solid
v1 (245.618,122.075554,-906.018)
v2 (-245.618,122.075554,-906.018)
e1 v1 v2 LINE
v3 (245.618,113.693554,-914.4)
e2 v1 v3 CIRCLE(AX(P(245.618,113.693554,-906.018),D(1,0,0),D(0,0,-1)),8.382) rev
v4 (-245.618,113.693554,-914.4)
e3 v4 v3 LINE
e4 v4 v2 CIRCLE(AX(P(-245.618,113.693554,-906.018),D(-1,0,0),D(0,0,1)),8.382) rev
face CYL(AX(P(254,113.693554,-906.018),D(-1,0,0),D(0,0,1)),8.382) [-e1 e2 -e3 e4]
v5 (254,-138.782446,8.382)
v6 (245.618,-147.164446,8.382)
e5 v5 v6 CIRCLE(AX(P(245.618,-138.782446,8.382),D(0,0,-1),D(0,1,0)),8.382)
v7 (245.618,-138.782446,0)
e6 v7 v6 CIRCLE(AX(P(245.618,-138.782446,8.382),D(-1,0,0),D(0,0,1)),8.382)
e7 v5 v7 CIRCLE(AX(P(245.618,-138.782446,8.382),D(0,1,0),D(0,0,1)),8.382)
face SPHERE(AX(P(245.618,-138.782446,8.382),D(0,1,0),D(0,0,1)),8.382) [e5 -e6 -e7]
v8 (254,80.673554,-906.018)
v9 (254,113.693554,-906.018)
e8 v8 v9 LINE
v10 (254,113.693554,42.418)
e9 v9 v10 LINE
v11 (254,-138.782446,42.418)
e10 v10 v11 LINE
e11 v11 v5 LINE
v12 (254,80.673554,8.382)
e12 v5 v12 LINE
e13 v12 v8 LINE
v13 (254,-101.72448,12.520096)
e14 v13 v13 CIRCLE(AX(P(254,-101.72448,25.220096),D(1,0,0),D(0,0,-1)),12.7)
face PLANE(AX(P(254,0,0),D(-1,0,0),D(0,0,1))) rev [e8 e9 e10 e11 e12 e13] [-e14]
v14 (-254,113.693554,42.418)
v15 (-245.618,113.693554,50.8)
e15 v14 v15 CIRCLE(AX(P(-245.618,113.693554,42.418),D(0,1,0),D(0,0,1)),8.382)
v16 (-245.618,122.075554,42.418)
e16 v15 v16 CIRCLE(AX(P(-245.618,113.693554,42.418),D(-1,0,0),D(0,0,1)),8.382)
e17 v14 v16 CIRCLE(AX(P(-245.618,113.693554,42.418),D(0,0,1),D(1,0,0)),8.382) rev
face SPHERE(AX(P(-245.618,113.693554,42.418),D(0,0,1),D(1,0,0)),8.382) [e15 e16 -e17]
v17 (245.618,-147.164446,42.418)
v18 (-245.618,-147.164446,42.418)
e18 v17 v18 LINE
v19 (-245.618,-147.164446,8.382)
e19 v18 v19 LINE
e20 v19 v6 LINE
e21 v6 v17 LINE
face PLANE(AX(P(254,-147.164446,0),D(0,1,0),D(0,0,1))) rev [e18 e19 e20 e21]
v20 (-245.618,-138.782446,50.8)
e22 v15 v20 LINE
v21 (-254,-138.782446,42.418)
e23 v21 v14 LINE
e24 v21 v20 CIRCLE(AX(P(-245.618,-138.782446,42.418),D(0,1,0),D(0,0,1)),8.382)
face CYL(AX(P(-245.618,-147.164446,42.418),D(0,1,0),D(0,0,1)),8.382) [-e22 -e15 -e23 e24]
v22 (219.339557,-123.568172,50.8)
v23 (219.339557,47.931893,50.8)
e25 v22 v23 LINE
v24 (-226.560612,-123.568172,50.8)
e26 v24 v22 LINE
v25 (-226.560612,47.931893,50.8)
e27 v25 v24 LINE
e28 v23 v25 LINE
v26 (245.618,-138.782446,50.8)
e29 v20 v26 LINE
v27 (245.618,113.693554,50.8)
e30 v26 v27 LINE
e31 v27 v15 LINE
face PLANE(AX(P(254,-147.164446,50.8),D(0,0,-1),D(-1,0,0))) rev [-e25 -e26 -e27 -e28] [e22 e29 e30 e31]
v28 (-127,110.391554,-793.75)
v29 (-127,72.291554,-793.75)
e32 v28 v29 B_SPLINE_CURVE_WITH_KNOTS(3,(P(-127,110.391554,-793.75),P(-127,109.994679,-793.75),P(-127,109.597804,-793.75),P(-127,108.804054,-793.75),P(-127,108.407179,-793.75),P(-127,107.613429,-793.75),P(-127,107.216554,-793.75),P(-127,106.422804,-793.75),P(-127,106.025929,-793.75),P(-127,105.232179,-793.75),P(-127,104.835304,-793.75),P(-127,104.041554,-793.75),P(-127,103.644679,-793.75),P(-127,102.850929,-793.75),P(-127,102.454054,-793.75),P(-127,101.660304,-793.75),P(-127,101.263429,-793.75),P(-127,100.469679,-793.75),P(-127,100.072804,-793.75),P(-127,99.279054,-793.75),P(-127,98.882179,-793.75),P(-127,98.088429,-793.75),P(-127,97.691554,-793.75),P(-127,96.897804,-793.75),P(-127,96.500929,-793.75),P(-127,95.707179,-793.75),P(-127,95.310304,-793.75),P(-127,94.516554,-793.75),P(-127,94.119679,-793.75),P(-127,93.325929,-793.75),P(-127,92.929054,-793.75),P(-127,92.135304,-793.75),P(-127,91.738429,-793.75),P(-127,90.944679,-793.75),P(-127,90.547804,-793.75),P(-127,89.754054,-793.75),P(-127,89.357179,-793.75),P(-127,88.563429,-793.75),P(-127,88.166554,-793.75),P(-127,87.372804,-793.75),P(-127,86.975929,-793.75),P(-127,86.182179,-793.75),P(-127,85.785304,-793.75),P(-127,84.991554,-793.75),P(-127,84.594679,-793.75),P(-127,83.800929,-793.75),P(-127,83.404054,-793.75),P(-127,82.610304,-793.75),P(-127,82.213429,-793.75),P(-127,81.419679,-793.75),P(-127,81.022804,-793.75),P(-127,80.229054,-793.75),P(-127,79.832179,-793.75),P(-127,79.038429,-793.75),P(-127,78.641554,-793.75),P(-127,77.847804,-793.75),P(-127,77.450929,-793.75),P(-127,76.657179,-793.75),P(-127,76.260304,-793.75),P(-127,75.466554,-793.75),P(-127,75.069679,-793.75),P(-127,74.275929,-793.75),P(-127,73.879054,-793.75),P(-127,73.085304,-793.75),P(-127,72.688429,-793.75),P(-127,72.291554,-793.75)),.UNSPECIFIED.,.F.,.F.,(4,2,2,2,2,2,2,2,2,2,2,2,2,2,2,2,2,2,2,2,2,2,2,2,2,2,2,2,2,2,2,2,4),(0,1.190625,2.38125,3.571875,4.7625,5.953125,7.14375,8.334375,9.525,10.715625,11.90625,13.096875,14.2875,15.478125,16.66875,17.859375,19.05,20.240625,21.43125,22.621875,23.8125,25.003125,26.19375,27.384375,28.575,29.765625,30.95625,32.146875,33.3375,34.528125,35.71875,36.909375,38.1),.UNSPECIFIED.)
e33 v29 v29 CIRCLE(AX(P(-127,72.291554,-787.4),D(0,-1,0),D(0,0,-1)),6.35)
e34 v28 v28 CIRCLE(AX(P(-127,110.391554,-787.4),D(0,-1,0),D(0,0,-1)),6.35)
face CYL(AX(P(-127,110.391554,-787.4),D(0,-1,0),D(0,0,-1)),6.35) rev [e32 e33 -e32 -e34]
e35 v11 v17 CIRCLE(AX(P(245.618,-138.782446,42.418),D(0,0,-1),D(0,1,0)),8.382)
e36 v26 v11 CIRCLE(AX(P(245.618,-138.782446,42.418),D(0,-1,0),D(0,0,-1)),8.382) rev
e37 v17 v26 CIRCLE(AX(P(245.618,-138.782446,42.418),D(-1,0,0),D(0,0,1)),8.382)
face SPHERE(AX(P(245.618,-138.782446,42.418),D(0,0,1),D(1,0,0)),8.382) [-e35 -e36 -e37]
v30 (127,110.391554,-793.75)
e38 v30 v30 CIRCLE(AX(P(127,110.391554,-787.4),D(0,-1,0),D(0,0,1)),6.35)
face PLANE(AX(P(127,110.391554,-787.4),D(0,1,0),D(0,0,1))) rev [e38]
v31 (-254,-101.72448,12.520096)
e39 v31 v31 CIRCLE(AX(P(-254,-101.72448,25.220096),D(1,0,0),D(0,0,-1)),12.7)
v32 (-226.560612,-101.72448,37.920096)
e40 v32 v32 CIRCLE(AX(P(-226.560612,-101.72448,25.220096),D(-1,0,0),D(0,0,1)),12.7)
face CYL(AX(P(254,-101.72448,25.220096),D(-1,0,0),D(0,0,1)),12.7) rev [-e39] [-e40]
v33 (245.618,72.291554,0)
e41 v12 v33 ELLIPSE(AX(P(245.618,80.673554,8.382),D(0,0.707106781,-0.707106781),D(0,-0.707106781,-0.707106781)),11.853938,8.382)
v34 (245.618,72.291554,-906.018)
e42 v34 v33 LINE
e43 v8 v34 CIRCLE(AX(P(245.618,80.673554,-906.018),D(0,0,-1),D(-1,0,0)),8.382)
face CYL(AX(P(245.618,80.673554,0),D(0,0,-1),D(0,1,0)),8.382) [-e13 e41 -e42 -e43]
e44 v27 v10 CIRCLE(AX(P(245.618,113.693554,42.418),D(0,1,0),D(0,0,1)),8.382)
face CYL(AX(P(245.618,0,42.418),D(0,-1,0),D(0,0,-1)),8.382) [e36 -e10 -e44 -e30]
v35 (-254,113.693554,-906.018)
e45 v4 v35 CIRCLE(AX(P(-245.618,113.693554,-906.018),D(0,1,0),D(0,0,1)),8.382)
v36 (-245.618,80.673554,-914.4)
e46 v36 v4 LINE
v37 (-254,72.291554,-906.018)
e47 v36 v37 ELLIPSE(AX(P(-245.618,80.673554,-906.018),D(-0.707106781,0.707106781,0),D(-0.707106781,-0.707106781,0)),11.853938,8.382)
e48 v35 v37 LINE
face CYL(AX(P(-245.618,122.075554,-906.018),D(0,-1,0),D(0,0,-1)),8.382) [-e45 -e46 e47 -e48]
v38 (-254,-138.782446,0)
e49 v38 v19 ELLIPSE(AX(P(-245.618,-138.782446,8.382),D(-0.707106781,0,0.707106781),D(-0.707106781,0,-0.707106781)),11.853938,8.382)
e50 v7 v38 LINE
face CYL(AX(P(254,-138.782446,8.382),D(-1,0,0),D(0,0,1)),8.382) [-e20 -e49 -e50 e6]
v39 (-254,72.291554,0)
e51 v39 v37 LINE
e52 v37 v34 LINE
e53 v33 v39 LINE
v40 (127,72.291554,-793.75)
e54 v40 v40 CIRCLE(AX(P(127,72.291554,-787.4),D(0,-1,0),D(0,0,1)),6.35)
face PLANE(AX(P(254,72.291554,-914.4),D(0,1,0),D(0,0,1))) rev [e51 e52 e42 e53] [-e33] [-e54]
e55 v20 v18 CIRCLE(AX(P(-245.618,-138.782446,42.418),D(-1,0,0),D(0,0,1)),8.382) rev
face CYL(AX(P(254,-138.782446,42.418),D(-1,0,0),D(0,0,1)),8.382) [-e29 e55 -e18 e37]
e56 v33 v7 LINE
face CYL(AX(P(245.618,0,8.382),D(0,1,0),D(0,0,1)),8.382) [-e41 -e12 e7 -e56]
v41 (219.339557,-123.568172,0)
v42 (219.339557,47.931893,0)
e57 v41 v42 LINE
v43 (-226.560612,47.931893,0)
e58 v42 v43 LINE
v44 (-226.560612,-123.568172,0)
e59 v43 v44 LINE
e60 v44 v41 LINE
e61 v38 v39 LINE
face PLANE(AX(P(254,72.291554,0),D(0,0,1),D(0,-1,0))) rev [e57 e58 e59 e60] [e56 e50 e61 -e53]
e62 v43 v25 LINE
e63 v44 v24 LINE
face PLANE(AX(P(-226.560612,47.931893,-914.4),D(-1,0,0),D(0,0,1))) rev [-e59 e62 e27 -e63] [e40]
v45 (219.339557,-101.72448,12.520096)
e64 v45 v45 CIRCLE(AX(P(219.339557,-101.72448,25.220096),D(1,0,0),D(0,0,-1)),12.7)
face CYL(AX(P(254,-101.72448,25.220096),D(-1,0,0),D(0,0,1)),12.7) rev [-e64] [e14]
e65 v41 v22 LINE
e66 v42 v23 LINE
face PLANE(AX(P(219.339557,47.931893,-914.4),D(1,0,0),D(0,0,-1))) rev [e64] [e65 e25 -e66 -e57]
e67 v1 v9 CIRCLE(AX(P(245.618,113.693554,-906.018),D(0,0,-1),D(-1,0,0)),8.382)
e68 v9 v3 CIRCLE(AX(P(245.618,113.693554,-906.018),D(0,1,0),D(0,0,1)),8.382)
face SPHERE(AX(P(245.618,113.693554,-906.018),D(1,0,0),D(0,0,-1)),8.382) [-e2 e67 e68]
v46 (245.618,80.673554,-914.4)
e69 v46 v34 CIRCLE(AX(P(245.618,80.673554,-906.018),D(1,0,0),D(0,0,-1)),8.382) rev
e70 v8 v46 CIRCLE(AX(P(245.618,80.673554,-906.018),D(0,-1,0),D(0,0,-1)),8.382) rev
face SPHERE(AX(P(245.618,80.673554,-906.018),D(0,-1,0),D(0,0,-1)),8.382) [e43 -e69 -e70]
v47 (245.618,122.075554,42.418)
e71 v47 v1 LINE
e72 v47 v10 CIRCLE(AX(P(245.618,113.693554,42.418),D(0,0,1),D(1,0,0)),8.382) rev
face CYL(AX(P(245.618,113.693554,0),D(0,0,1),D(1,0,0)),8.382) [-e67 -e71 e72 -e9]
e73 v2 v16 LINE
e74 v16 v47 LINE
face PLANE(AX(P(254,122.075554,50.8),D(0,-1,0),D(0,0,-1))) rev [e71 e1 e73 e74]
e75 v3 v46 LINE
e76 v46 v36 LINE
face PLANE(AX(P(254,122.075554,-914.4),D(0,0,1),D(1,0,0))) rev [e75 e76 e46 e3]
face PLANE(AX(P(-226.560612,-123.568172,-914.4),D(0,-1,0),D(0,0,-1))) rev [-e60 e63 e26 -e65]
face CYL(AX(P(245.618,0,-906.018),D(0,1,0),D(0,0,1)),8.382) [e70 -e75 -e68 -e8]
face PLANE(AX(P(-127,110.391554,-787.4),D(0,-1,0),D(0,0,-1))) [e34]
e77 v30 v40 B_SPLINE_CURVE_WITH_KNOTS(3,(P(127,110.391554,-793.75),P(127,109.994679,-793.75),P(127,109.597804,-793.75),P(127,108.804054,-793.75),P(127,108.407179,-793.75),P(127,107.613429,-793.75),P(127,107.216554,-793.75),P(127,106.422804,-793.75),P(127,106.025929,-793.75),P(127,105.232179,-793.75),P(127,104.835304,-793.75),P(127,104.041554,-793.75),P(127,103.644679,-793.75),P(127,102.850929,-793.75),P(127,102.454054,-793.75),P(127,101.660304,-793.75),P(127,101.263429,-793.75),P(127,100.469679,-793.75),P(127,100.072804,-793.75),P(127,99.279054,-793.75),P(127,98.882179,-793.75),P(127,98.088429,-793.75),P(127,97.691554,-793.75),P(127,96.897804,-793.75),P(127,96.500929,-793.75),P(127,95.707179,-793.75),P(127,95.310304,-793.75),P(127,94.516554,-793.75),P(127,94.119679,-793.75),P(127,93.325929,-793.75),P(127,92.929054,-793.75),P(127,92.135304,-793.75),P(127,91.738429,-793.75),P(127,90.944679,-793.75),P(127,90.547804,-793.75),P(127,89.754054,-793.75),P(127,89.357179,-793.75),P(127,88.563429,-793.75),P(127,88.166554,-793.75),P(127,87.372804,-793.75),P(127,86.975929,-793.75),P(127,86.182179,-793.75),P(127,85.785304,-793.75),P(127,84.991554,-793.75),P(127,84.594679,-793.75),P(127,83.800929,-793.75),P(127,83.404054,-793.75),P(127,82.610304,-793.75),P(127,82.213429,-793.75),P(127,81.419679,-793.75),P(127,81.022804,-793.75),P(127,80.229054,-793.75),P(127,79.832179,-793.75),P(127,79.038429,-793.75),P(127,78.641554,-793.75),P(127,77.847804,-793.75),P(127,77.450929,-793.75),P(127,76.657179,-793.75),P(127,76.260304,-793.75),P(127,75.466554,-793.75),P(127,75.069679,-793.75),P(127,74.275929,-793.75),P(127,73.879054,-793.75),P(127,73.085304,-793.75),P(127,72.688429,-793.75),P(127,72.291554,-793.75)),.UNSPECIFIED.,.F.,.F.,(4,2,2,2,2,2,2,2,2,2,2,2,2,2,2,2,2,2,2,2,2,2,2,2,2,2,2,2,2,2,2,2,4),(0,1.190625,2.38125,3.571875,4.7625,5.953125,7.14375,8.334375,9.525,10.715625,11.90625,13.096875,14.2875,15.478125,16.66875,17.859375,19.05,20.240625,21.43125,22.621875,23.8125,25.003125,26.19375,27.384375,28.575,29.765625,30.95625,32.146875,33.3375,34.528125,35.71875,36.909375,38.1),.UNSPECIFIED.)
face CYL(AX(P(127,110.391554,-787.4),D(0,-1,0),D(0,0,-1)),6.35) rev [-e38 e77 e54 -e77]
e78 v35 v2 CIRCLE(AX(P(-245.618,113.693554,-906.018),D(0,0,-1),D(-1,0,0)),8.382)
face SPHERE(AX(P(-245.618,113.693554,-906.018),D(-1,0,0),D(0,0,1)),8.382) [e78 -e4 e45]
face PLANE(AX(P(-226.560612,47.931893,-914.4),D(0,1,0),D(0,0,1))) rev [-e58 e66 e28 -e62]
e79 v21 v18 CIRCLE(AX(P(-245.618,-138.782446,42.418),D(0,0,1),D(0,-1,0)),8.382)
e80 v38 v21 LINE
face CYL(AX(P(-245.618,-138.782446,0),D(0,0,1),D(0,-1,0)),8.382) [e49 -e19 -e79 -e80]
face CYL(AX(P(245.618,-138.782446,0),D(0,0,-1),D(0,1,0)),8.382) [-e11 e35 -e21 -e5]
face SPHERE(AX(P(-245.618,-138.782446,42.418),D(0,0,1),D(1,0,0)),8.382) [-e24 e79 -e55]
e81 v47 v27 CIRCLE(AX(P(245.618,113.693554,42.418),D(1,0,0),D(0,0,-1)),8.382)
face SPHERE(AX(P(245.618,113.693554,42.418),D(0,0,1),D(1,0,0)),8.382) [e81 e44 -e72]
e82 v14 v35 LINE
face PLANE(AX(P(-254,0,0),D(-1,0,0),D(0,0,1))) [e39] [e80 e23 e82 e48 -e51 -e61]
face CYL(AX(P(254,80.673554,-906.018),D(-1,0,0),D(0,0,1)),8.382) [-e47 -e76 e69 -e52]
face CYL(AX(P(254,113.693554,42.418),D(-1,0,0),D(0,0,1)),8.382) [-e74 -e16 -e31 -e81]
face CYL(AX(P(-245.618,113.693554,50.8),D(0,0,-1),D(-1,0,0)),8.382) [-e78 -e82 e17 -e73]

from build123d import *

# Parameters (mm, degrees)
SKETCH1_R           = 12.7
BOSS_EXTRUDE1_DEPTH = 254
FILLET1_R           = 8.382
FILLET2_R           = 8.382
SKETCH6_W           = 445.900168358
SKETCH6_H           = 171.500064753
CUT_EXTRUDE4_DEPTH  = 1009.8530191
SKETCH2_R           = 6.35
CUT_EXTRUDE5_DEPTH  = 38.1


with BuildPart() as part:
    # Sketch1 → Boss-Extrude1 (new, symmetric)
    with BuildSketch(Plane(origin=(0, 0, 0), x_dir=(0, 0, -1), z_dir=(1, 0, 0))):
        Polygon((-50.8, 122.075554067), (914.4, 122.075554067), (914.4, 72.291554067), (0, 72.291554067), (0, -147.164445933), (-50.8, -147.164445933), align=None)
        with Locations((-25.220095835, -101.724479604)):
            Circle(SKETCH1_R, mode=Mode.SUBTRACT)
    extrude(amount=BOSS_EXTRUDE1_DEPTH, both=True)

    # Fillet1
    fillet1_edges = [part.edges().sort_by_distance(p)[0] for p in [
        (0, 122.075554067, 50.8),
        (0, 122.075554067, -914.4),
        (0, 72.291554067, -914.4),
        (0, -147.164445933, 50.8),
        (254, -37.436445933, 0),
        (254, 72.291554067, -457.2),
        (254, 97.183554067, -914.4),
        (254, 122.075554067, -431.8),
        (254, -12.544445933, 50.8),
        (-254, 122.075554067, -431.8),
        (-254, 97.183554067, -914.4),
        (-254, -12.544445933, 50.8),
    ]]
    fillet(fillet1_edges, radius=FILLET1_R)

    # Fillet2
    # the kernel refuses this fillet: 8.382 mm, written as the material it takes off along each edge
    with BuildSketch(Plane(origin=(245.618, -138.782445933, 42.418), x_dir=(0, -1, 0), z_dir=(1, 0, 0))) as fillet2_piece_1_section:
        Polygon((0, 0), (FILLET2_R, 0), (FILLET2_R, -FILLET2_R), (0, -FILLET2_R), align=None)
    fillet2_piece_1 = extrude(amount=FILLET2_R, mode=Mode.PRIVATE)
    fillet2_piece_1 = fillet2_piece_1 - Plane(origin=(245.618, -138.782445933, 42.418), x_dir=(0, 0.7071067811865477, -0.7071067811865474), z_dir=(1, 0, 0)) * Sphere(FILLET2_R, mode=Mode.PRIVATE)
    add(fillet2_piece_1, mode=Mode.SUBTRACT)
    with BuildSketch(Plane(origin=(-245.618, -138.782445933, 42.418), x_dir=(0, -1, 0), z_dir=(-1, 0, 0))) as fillet2_piece_2_section:
        Polygon((0, 0), (FILLET2_R, 0), (FILLET2_R, FILLET2_R), (0, FILLET2_R), align=None)
    fillet2_piece_2 = extrude(amount=FILLET2_R, mode=Mode.PRIVATE)
    fillet2_piece_2 = fillet2_piece_2 - Plane(origin=(-245.618, -138.782445933, 42.418), x_dir=(0, 0.7071067811865477, -0.7071067811865474), z_dir=(-1, 0, 0)) * Sphere(FILLET2_R, mode=Mode.PRIVATE)
    add(fillet2_piece_2, mode=Mode.SUBTRACT)
    with BuildSketch(Plane(origin=(254, -147.164445933, 8.382), x_dir=(0, 1, 0), z_dir=(0, 0, 1))) as fillet2_piece_3:
        with BuildLine():
            CenterArc((FILLET2_R, FILLET2_R), FILLET2_R, 180, 90)
            Line((0, FILLET2_R), (0, 0))
            Line((0, 0), (FILLET2_R, 0))
        make_face()
    extrude(amount=34.036, mode=Mode.SUBTRACT)
    with BuildSketch(Plane(origin=(-254, -147.164445933, -20.955), x_dir=(0, 1, 0), z_dir=(0, 0, 1))) as fillet2_piece_4:
        with BuildLine():
            CenterArc((FILLET2_R, -FILLET2_R), FILLET2_R, 90, 90)
            Line((0, -FILLET2_R), (0, 0))
            Line((0, 0), (FILLET2_R, 0))
        make_face()
    extrude(amount=63.373, mode=Mode.SUBTRACT)
    with BuildSketch(Plane(origin=(-274.955, -147.164445933, 0), x_dir=(0, 1, 0), z_dir=(1, 0, 0))) as fillet2_piece_5:
        with BuildLine():
            CenterArc((FILLET2_R, FILLET2_R), FILLET2_R, 180, 90)
            Line((0, FILLET2_R), (0, 0))
            Line((0, 0), (FILLET2_R, 0))
        make_face()
    extrude(amount=520.573, mode=Mode.SUBTRACT)
    with BuildSketch(Plane(origin=(245.618, -147.164445933, 8.382), x_dir=(1, 0, 0), z_dir=(0, 0, 1))) as fillet2_piece_6:
        with BuildLine():
            CenterArc((8.382 - FILLET2_R, FILLET2_R), FILLET2_R, 270, 90)
            Line((8.382, FILLET2_R), (8.382, 0))
            Line((8.382, 0), (8.382 - FILLET2_R, 0))
        make_face()
    revolve(axis=Axis((245.618, -147.164445933, 8.382), (0, 1, 0)), revolution_arc=90, mode=Mode.SUBTRACT)

    # Sketch6 → Cut-Extrude4 (cut, through all)
    with BuildSketch(Plane.XY.offset(50.8)):
        with Locations((-3.610527679, -37.818139686)):
            Rectangle(SKETCH6_W, SKETCH6_H)
    extrude(amount=-CUT_EXTRUDE4_DEPTH, mode=Mode.SUBTRACT)

    # Sketch2 → Cut-Extrude5 (cut)
    with BuildSketch(Plane.XZ.offset(-72.291554067)):
        with Locations(Location((-127, -787.4, 0), (0, 0, 270))):
            Circle(SKETCH2_R)
        with Locations(Location((127, -787.4, 0), (0, 0, 270))):
            Circle(SKETCH2_R)
    extrude(amount=-CUT_EXTRUDE5_DEPTH, mode=Mode.SUBTRACT)


solid = part.part
